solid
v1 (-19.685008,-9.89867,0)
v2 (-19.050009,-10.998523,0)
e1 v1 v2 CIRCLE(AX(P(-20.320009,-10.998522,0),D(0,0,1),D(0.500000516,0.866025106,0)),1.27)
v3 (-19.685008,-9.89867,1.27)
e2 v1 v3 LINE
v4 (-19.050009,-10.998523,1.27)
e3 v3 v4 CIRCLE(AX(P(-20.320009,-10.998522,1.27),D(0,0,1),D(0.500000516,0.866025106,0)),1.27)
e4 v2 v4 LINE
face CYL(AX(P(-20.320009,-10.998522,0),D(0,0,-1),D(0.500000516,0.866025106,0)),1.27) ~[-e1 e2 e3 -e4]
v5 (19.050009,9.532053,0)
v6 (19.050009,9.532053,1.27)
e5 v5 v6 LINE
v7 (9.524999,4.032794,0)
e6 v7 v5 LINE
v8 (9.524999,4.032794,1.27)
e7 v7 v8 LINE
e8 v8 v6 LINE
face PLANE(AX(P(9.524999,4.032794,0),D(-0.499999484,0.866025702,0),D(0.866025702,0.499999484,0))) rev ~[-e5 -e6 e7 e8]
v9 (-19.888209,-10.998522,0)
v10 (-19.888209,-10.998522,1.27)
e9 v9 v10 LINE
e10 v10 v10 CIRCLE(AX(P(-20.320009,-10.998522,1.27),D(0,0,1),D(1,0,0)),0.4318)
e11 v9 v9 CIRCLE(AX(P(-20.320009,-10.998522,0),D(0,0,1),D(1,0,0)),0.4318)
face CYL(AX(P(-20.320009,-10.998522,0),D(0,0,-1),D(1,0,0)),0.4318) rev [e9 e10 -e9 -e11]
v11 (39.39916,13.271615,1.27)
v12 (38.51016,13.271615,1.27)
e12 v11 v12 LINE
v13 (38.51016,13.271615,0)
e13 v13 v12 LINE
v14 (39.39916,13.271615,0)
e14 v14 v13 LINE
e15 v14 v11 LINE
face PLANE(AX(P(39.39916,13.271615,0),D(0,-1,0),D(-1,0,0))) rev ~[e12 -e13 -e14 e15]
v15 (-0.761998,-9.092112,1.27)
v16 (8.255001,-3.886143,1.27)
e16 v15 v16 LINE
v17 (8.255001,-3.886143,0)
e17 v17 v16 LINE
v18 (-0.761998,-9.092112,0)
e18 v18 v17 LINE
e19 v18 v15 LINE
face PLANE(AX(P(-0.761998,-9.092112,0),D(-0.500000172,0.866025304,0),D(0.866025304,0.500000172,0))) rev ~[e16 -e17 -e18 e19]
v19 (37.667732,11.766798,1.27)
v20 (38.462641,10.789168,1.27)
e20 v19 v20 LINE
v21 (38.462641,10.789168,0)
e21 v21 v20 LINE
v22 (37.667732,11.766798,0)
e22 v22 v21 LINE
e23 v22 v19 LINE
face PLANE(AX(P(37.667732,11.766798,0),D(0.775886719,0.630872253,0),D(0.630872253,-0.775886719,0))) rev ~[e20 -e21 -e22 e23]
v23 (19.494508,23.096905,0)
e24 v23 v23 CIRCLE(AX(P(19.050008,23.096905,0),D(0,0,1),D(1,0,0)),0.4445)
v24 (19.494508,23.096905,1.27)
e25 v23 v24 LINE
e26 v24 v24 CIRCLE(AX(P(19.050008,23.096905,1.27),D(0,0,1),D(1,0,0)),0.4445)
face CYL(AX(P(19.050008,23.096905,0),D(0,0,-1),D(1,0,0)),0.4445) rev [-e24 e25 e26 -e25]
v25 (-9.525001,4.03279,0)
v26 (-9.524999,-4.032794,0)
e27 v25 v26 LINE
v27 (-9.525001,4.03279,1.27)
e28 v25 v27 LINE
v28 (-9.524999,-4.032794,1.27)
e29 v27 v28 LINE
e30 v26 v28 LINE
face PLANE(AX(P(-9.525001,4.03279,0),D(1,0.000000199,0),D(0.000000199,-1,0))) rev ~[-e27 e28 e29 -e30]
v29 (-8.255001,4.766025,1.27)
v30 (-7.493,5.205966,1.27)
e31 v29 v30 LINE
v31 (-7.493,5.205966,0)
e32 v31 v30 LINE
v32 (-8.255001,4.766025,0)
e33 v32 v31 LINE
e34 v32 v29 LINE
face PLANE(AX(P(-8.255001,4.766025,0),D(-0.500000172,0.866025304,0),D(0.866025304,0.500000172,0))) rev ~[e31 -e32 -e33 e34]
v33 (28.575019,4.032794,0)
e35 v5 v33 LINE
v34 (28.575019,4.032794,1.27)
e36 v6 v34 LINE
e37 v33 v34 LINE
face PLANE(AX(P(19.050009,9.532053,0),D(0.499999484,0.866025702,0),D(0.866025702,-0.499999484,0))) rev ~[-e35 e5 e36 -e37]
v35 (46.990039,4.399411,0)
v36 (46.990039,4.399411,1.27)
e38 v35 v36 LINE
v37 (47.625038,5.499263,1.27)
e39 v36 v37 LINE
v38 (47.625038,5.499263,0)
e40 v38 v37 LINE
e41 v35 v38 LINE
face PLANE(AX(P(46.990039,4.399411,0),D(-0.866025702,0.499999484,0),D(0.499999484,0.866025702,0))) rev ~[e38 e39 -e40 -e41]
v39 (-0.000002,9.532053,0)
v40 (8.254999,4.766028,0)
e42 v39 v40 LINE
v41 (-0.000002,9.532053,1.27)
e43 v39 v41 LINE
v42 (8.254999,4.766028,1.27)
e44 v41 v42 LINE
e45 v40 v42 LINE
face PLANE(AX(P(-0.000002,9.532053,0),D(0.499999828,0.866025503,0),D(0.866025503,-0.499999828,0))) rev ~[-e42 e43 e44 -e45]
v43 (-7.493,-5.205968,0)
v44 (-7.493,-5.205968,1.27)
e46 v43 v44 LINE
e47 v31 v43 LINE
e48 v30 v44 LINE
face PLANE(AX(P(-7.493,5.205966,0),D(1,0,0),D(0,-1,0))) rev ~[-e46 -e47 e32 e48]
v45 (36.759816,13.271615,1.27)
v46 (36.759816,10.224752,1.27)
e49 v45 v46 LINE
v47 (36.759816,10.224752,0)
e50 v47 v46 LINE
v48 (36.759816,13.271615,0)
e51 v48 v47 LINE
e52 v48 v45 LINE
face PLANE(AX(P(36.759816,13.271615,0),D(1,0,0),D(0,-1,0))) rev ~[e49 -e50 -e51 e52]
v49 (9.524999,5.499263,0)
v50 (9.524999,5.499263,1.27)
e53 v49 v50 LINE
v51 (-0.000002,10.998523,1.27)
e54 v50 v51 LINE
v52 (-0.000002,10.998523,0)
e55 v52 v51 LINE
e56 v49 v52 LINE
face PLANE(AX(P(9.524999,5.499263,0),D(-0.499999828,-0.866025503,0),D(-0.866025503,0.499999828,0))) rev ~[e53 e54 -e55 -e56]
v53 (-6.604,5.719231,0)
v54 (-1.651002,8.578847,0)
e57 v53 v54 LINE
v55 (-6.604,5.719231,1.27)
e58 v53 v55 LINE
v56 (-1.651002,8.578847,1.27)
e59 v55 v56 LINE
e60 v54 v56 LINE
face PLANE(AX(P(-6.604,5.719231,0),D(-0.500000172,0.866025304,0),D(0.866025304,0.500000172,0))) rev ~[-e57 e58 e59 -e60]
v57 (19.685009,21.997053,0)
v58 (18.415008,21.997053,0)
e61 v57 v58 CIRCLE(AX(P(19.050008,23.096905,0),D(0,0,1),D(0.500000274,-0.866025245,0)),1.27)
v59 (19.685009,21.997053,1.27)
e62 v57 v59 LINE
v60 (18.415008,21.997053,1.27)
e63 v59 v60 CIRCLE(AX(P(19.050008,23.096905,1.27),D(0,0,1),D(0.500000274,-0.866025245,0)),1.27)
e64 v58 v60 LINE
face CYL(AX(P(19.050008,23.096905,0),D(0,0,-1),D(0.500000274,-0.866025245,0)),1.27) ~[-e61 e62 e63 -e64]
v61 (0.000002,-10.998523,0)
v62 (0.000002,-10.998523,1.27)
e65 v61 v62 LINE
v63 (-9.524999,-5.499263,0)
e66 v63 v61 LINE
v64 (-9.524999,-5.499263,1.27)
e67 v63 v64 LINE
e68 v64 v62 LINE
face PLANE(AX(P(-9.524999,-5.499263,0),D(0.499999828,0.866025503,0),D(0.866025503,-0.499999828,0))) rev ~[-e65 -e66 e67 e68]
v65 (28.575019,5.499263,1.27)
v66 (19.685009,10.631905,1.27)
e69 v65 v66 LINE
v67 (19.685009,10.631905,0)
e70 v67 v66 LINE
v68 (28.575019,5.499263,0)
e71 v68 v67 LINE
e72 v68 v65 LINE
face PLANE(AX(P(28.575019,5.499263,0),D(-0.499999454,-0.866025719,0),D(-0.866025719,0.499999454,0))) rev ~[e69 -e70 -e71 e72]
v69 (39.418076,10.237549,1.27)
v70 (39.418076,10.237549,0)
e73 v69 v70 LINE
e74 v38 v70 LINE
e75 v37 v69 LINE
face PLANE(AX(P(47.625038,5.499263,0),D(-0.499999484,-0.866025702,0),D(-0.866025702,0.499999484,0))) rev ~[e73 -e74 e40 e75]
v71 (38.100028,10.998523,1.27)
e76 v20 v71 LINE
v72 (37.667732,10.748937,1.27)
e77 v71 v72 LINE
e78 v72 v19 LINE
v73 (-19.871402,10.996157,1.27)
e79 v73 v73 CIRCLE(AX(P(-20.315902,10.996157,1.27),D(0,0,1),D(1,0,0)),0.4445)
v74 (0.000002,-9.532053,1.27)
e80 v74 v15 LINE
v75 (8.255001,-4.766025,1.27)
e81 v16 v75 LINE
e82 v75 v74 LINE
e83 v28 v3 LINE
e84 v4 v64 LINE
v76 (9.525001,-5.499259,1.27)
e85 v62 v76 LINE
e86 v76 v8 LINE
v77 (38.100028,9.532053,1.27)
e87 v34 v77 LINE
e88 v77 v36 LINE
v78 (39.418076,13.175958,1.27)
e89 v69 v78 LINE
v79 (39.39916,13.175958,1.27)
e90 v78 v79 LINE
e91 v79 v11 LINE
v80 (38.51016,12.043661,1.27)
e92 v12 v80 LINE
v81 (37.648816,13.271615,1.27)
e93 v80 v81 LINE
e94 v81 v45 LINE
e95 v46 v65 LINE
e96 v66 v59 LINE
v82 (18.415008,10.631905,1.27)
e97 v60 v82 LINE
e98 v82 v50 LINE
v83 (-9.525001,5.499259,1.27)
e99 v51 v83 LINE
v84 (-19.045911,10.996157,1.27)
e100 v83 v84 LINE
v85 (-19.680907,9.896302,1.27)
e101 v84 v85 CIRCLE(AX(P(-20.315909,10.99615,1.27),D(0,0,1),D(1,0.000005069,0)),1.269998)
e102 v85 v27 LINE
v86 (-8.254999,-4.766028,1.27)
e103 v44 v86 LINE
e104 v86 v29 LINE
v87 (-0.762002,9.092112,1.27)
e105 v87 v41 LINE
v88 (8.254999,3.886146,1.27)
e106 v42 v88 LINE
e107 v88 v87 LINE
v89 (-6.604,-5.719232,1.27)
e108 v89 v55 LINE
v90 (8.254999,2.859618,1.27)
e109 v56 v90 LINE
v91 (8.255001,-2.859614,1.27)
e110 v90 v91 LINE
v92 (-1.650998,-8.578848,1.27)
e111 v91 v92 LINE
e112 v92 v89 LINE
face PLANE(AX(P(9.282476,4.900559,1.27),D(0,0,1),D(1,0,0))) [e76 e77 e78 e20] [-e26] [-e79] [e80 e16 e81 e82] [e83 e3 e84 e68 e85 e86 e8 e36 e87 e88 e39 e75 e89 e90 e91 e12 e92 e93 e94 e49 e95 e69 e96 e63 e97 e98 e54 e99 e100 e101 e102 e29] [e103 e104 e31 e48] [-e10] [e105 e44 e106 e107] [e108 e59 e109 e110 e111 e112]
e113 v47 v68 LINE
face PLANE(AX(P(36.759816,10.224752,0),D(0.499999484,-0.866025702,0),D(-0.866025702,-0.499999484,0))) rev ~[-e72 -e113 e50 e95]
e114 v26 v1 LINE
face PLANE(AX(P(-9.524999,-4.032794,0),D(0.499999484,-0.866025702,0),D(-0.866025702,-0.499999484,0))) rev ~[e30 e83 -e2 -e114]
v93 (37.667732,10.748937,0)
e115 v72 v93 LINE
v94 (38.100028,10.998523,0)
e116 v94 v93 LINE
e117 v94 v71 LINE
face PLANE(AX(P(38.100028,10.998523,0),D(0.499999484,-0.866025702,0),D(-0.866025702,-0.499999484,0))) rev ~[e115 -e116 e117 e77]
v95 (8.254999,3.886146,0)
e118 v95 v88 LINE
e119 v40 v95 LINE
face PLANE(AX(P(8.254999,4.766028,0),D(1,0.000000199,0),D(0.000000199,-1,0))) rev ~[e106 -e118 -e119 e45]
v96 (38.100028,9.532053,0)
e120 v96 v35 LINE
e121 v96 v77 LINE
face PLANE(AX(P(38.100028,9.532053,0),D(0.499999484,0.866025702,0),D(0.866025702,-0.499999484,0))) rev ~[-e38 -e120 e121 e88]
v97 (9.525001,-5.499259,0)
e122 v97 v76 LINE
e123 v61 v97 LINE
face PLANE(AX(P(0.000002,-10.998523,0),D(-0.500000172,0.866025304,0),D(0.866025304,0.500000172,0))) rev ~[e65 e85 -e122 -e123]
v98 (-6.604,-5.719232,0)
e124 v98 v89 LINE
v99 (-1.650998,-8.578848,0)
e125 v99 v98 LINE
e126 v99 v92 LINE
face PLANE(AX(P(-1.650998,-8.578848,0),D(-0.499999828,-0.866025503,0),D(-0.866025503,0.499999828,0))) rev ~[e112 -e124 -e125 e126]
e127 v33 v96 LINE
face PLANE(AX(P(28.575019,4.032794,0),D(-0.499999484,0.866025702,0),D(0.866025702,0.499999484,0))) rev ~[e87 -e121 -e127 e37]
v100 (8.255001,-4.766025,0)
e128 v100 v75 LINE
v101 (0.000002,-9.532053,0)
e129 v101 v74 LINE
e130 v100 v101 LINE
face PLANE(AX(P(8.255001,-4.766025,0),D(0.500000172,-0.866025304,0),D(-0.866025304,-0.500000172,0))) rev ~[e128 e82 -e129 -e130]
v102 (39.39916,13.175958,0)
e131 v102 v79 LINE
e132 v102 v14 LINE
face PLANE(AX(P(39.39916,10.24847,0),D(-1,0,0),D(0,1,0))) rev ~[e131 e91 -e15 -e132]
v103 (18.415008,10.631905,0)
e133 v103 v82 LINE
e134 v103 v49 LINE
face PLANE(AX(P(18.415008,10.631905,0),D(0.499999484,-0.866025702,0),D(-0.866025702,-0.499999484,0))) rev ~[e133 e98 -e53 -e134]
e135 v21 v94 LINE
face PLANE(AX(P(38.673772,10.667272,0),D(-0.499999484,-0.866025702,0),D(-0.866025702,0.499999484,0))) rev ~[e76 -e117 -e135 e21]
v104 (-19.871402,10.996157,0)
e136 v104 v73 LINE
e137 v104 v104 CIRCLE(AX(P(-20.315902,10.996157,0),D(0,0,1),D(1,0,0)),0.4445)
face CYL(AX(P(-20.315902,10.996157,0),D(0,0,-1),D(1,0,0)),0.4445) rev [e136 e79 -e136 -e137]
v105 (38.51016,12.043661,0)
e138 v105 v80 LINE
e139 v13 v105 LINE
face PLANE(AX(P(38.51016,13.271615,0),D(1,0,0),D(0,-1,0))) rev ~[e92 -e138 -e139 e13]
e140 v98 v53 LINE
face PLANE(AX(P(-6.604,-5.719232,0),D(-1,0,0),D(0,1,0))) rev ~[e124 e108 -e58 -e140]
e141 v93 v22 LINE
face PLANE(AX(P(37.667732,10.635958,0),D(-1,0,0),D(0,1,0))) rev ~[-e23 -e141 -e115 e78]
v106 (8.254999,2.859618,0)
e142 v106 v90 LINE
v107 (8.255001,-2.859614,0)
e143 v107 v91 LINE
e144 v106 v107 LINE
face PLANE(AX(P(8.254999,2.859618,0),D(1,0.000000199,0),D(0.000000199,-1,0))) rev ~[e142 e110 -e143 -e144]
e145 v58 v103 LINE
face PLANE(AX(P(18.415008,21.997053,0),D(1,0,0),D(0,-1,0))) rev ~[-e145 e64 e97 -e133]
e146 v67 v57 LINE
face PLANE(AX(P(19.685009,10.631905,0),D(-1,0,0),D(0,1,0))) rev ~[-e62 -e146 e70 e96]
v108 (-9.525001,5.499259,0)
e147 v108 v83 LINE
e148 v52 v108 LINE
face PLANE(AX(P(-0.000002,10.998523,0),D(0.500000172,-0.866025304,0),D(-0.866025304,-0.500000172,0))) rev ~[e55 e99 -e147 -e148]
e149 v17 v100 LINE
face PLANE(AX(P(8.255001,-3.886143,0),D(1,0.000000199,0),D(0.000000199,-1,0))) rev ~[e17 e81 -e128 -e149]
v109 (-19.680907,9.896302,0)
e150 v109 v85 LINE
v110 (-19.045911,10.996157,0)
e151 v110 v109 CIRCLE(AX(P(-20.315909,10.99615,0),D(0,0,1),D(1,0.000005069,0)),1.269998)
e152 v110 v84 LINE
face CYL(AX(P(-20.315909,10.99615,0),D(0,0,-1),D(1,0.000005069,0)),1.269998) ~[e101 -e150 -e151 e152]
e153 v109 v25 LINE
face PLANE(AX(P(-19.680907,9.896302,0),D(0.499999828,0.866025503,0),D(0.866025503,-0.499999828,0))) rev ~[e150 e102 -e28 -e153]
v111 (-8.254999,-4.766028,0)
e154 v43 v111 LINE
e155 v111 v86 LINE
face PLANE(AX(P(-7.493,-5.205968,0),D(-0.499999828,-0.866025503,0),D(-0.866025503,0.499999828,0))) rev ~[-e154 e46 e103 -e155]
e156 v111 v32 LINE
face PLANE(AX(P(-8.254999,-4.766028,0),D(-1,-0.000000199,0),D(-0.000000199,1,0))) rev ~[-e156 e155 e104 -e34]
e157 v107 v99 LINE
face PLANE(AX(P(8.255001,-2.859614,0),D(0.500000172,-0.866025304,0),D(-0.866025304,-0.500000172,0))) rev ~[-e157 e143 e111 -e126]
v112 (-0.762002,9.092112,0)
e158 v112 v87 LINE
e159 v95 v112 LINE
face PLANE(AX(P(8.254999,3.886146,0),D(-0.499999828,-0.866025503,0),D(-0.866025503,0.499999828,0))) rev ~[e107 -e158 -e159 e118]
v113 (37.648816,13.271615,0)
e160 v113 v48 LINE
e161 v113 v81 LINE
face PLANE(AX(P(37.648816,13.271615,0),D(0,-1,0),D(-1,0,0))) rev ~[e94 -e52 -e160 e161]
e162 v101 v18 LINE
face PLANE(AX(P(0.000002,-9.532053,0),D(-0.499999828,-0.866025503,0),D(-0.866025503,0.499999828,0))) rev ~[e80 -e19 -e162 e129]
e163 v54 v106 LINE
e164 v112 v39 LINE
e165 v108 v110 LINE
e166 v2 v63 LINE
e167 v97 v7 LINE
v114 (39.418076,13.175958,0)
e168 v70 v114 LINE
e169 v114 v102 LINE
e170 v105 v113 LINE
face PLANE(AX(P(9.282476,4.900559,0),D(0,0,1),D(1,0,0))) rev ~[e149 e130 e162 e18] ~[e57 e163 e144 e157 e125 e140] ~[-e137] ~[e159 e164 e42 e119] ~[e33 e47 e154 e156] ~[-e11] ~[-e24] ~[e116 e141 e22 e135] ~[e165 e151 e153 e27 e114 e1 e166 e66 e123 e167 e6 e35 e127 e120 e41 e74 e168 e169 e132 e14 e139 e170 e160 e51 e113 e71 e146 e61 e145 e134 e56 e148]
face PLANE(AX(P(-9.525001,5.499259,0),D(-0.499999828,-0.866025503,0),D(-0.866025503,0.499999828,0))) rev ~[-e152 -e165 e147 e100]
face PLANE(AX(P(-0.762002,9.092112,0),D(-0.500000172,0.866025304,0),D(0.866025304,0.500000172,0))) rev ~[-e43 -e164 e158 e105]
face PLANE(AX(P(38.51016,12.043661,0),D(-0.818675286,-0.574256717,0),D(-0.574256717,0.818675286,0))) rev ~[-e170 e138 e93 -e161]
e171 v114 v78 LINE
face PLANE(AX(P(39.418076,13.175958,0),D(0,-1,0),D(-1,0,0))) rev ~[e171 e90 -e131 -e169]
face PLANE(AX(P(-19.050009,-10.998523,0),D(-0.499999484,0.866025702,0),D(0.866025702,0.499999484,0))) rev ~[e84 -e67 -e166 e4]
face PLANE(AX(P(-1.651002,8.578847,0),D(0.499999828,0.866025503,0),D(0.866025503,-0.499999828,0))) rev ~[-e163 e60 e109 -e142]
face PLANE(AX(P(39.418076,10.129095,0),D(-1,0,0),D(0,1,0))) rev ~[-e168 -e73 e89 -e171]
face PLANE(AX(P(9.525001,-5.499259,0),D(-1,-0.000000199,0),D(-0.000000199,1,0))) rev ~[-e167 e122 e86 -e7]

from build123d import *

# Parameters (mm, degrees)
F0_R     = 0.4318
F0_R_2   = 0.4445
F1_DEPTH = 1.27
F3_DEPTH = 1.27


# Not quite as in the source:
# - ends of sketch curves that miss each other by under 0.0002 mm in the source are joined


with BuildPart() as f1:
    # F0 (on Top) → F1 (new body)
    with BuildSketch(Plane.XY):
        with BuildLine():
            Line((9.5249989071, 5.499263207), (-2.1858e-06, 10.9985226281))
            Line((-2.1858e-06, 10.9985226281), (-9.5250010929, 5.499259421))
            Line((-9.5250010929, 5.499259421), (-19.0459112442, 10.9961569369))
            ThreePointArc((-19.0459112442, 10.9961569369), (-21.4157534444, 11.6311591353), (-19.6809068475, 9.8963021357))
            Line((-19.6809068475, 9.8963021357), (-9.5250008015, 4.0327897373))
            Line((-9.5250008015, 4.0327897373), (-9.5249991985, -4.0327941963))
            Line((-9.5249991985, -4.0327941963), (-19.6850080876, -9.8986699867))
            ThreePointArc((-19.6850080876, -9.8986699867), (-21.4198613847, -11.6335212151), (-19.0500087433, -10.9985226281))
            Line((-19.0500087433, -10.9985226281), (-9.5249989071, -5.499263207))
            Line((-9.5249989071, -5.499263207), (2.1858e-06, -10.9985226281))
            Line((2.1858e-06, -10.9985226281), (9.5250010929, -5.499259421))
            Line((9.5250010929, -5.499259421), (9.5249991985, 4.0327941963))
            Line((9.5249991985, 4.0327941963), (19.0500087433, 9.5320534491))
            Line((19.0500087433, 9.5320534491), (28.5750185796, 4.0327940281))
            Line((28.5750185796, 4.0327940281), (38.1000284158, 9.5320534491))
            Line((38.1000284158, 9.5320534491), (46.9900389078, 4.3994105656))
            Line((46.9900389078, 4.3994105656), (47.625038252, 5.499263207))
            Line((47.625038252, 5.499263207), (39.3991596309, 10.2484699041))
            Line((39.3991596309, 10.2484699041), (39.3991596309, 10.224751758))
            Line((39.3991596309, 10.224751758), (38.673771624, 10.6672722885))
            Line((38.673771624, 10.6672722885), (38.1000284158, 10.9985226281))
            Line((38.1000284158, 10.9985226281), (37.6488161101, 10.7380154406))
            Line((37.6488161101, 10.7380154406), (37.6488161101, 10.731614756))
            Line((37.6488161101, 10.731614756), (36.7598161101, 10.224751758))
            Line((36.7598161101, 10.224751758), (28.5750185796, 5.499263207))
            Line((28.5750185796, 5.499263207), (19.6850087433, 10.6319053096))
            Line((19.6850087433, 10.6319053096), (19.6850087433, 10.9985226281))
            Line((19.6850087433, 10.9985226281), (19.6850087433, 21.9970528281))
            ThreePointArc((19.6850087433, 21.9970528281), (19.0500083949, 24.3669048897), (18.4150080465, 21.9970528281))
            Line((18.4150080465, 21.9970528281), (18.4150080465, 10.9985226281))
            Line((18.4150080465, 10.9985226281), (18.4150080465, 10.6319053096))
            Line((18.4150080465, 10.6319053096), (9.5249989071, 5.499263207))
        make_face()
        with Locations((-20.3200087433, -10.9985218709)):
            Circle(F0_R, mode=Mode.SUBTRACT)
        Polygon((8.2550007723, -3.8861430213), (8.2550009472, -4.7660248316), (1.8944e-06, -9.5320529443), (-0.761998193, -9.0921121906), align=None, mode=Mode.SUBTRACT)
        Polygon((-8.255, -1.6406e-06), (-8.2550009472, 4.7660248316), (-7.493, 5.2059664855), (-7.493, -1.6406e-06), (-7.493, -5.2059682691), (-8.2549990528, -4.7660281127), align=None, mode=Mode.SUBTRACT)
        Polygon((-6.604, -5.499263207), (-6.604, 5.7192311104), (-1.6510017049, 8.5788473218), (8.2549994317, 2.8596175239), (8.2550005683, -2.8596142427), (-1.6509982951, -8.578847978), (-6.604, -5.7192324228), align=None, mode=Mode.SUBTRACT)
        with Locations((-20.3159024508, 10.9961569369)):
            Circle(F0_R_2, mode=Mode.SUBTRACT)
        Polygon((-1.8944e-06, 9.5320529443), (8.2549990528, 4.7660281127), (8.2549992277, 3.8861463025), (-0.762001807, 9.0921118878), align=None, mode=Mode.SUBTRACT)
        with Locations((19.0500083949, 23.0969048897)):
            Circle(F0_R_2, mode=Mode.SUBTRACT)
        Polygon((36.7598161101, 10.731614756), (36.7598161101, 10.224751758), (37.6488161101, 10.7380154406), (37.6488161101, 11.8624546668), (38.5683002365, 10.731614756), (38.673771624, 10.6672722885), (39.3991596309, 10.2484699041), (39.3991596309, 10.731614756), (39.3991596309, 13.271614756), (38.5101596309, 13.271614756), (38.5101596309, 12.0436610678), (37.6488161101, 13.271614756), (36.7598161101, 13.271614756), align=None)
        Polygon((37.6488161101, 10.7380154406), (36.7598161101, 10.224751758), (37.6488161101, 10.731614756), align=None)
        Polygon((39.3991596309, 10.2484699041), (38.673771624, 10.6672722885), (39.3991596309, 10.224751758), align=None)
    extrude(amount=F1_DEPTH)

    # F2 (on Top) → F3 (join)
    with BuildSketch(Plane.XY):
        Polygon((37.6677321614, 13.1759580532), (36.7787321614, 13.1759580532), (36.7787321614, 10.6359580532), (36.7787321614, 10.1290950552), (37.6677321614, 10.6359580532), (37.6677321614, 11.7667979639), (38.5872162879, 10.6359580532), (39.4180756822, 10.1290950552), (39.4180756822, 10.6359580532), (39.4180756822, 13.1759580532), (38.5290756822, 13.1759580532), (38.5290756822, 11.948004365), align=None)
    extrude(amount=F3_DEPTH)


solid = f1.part
